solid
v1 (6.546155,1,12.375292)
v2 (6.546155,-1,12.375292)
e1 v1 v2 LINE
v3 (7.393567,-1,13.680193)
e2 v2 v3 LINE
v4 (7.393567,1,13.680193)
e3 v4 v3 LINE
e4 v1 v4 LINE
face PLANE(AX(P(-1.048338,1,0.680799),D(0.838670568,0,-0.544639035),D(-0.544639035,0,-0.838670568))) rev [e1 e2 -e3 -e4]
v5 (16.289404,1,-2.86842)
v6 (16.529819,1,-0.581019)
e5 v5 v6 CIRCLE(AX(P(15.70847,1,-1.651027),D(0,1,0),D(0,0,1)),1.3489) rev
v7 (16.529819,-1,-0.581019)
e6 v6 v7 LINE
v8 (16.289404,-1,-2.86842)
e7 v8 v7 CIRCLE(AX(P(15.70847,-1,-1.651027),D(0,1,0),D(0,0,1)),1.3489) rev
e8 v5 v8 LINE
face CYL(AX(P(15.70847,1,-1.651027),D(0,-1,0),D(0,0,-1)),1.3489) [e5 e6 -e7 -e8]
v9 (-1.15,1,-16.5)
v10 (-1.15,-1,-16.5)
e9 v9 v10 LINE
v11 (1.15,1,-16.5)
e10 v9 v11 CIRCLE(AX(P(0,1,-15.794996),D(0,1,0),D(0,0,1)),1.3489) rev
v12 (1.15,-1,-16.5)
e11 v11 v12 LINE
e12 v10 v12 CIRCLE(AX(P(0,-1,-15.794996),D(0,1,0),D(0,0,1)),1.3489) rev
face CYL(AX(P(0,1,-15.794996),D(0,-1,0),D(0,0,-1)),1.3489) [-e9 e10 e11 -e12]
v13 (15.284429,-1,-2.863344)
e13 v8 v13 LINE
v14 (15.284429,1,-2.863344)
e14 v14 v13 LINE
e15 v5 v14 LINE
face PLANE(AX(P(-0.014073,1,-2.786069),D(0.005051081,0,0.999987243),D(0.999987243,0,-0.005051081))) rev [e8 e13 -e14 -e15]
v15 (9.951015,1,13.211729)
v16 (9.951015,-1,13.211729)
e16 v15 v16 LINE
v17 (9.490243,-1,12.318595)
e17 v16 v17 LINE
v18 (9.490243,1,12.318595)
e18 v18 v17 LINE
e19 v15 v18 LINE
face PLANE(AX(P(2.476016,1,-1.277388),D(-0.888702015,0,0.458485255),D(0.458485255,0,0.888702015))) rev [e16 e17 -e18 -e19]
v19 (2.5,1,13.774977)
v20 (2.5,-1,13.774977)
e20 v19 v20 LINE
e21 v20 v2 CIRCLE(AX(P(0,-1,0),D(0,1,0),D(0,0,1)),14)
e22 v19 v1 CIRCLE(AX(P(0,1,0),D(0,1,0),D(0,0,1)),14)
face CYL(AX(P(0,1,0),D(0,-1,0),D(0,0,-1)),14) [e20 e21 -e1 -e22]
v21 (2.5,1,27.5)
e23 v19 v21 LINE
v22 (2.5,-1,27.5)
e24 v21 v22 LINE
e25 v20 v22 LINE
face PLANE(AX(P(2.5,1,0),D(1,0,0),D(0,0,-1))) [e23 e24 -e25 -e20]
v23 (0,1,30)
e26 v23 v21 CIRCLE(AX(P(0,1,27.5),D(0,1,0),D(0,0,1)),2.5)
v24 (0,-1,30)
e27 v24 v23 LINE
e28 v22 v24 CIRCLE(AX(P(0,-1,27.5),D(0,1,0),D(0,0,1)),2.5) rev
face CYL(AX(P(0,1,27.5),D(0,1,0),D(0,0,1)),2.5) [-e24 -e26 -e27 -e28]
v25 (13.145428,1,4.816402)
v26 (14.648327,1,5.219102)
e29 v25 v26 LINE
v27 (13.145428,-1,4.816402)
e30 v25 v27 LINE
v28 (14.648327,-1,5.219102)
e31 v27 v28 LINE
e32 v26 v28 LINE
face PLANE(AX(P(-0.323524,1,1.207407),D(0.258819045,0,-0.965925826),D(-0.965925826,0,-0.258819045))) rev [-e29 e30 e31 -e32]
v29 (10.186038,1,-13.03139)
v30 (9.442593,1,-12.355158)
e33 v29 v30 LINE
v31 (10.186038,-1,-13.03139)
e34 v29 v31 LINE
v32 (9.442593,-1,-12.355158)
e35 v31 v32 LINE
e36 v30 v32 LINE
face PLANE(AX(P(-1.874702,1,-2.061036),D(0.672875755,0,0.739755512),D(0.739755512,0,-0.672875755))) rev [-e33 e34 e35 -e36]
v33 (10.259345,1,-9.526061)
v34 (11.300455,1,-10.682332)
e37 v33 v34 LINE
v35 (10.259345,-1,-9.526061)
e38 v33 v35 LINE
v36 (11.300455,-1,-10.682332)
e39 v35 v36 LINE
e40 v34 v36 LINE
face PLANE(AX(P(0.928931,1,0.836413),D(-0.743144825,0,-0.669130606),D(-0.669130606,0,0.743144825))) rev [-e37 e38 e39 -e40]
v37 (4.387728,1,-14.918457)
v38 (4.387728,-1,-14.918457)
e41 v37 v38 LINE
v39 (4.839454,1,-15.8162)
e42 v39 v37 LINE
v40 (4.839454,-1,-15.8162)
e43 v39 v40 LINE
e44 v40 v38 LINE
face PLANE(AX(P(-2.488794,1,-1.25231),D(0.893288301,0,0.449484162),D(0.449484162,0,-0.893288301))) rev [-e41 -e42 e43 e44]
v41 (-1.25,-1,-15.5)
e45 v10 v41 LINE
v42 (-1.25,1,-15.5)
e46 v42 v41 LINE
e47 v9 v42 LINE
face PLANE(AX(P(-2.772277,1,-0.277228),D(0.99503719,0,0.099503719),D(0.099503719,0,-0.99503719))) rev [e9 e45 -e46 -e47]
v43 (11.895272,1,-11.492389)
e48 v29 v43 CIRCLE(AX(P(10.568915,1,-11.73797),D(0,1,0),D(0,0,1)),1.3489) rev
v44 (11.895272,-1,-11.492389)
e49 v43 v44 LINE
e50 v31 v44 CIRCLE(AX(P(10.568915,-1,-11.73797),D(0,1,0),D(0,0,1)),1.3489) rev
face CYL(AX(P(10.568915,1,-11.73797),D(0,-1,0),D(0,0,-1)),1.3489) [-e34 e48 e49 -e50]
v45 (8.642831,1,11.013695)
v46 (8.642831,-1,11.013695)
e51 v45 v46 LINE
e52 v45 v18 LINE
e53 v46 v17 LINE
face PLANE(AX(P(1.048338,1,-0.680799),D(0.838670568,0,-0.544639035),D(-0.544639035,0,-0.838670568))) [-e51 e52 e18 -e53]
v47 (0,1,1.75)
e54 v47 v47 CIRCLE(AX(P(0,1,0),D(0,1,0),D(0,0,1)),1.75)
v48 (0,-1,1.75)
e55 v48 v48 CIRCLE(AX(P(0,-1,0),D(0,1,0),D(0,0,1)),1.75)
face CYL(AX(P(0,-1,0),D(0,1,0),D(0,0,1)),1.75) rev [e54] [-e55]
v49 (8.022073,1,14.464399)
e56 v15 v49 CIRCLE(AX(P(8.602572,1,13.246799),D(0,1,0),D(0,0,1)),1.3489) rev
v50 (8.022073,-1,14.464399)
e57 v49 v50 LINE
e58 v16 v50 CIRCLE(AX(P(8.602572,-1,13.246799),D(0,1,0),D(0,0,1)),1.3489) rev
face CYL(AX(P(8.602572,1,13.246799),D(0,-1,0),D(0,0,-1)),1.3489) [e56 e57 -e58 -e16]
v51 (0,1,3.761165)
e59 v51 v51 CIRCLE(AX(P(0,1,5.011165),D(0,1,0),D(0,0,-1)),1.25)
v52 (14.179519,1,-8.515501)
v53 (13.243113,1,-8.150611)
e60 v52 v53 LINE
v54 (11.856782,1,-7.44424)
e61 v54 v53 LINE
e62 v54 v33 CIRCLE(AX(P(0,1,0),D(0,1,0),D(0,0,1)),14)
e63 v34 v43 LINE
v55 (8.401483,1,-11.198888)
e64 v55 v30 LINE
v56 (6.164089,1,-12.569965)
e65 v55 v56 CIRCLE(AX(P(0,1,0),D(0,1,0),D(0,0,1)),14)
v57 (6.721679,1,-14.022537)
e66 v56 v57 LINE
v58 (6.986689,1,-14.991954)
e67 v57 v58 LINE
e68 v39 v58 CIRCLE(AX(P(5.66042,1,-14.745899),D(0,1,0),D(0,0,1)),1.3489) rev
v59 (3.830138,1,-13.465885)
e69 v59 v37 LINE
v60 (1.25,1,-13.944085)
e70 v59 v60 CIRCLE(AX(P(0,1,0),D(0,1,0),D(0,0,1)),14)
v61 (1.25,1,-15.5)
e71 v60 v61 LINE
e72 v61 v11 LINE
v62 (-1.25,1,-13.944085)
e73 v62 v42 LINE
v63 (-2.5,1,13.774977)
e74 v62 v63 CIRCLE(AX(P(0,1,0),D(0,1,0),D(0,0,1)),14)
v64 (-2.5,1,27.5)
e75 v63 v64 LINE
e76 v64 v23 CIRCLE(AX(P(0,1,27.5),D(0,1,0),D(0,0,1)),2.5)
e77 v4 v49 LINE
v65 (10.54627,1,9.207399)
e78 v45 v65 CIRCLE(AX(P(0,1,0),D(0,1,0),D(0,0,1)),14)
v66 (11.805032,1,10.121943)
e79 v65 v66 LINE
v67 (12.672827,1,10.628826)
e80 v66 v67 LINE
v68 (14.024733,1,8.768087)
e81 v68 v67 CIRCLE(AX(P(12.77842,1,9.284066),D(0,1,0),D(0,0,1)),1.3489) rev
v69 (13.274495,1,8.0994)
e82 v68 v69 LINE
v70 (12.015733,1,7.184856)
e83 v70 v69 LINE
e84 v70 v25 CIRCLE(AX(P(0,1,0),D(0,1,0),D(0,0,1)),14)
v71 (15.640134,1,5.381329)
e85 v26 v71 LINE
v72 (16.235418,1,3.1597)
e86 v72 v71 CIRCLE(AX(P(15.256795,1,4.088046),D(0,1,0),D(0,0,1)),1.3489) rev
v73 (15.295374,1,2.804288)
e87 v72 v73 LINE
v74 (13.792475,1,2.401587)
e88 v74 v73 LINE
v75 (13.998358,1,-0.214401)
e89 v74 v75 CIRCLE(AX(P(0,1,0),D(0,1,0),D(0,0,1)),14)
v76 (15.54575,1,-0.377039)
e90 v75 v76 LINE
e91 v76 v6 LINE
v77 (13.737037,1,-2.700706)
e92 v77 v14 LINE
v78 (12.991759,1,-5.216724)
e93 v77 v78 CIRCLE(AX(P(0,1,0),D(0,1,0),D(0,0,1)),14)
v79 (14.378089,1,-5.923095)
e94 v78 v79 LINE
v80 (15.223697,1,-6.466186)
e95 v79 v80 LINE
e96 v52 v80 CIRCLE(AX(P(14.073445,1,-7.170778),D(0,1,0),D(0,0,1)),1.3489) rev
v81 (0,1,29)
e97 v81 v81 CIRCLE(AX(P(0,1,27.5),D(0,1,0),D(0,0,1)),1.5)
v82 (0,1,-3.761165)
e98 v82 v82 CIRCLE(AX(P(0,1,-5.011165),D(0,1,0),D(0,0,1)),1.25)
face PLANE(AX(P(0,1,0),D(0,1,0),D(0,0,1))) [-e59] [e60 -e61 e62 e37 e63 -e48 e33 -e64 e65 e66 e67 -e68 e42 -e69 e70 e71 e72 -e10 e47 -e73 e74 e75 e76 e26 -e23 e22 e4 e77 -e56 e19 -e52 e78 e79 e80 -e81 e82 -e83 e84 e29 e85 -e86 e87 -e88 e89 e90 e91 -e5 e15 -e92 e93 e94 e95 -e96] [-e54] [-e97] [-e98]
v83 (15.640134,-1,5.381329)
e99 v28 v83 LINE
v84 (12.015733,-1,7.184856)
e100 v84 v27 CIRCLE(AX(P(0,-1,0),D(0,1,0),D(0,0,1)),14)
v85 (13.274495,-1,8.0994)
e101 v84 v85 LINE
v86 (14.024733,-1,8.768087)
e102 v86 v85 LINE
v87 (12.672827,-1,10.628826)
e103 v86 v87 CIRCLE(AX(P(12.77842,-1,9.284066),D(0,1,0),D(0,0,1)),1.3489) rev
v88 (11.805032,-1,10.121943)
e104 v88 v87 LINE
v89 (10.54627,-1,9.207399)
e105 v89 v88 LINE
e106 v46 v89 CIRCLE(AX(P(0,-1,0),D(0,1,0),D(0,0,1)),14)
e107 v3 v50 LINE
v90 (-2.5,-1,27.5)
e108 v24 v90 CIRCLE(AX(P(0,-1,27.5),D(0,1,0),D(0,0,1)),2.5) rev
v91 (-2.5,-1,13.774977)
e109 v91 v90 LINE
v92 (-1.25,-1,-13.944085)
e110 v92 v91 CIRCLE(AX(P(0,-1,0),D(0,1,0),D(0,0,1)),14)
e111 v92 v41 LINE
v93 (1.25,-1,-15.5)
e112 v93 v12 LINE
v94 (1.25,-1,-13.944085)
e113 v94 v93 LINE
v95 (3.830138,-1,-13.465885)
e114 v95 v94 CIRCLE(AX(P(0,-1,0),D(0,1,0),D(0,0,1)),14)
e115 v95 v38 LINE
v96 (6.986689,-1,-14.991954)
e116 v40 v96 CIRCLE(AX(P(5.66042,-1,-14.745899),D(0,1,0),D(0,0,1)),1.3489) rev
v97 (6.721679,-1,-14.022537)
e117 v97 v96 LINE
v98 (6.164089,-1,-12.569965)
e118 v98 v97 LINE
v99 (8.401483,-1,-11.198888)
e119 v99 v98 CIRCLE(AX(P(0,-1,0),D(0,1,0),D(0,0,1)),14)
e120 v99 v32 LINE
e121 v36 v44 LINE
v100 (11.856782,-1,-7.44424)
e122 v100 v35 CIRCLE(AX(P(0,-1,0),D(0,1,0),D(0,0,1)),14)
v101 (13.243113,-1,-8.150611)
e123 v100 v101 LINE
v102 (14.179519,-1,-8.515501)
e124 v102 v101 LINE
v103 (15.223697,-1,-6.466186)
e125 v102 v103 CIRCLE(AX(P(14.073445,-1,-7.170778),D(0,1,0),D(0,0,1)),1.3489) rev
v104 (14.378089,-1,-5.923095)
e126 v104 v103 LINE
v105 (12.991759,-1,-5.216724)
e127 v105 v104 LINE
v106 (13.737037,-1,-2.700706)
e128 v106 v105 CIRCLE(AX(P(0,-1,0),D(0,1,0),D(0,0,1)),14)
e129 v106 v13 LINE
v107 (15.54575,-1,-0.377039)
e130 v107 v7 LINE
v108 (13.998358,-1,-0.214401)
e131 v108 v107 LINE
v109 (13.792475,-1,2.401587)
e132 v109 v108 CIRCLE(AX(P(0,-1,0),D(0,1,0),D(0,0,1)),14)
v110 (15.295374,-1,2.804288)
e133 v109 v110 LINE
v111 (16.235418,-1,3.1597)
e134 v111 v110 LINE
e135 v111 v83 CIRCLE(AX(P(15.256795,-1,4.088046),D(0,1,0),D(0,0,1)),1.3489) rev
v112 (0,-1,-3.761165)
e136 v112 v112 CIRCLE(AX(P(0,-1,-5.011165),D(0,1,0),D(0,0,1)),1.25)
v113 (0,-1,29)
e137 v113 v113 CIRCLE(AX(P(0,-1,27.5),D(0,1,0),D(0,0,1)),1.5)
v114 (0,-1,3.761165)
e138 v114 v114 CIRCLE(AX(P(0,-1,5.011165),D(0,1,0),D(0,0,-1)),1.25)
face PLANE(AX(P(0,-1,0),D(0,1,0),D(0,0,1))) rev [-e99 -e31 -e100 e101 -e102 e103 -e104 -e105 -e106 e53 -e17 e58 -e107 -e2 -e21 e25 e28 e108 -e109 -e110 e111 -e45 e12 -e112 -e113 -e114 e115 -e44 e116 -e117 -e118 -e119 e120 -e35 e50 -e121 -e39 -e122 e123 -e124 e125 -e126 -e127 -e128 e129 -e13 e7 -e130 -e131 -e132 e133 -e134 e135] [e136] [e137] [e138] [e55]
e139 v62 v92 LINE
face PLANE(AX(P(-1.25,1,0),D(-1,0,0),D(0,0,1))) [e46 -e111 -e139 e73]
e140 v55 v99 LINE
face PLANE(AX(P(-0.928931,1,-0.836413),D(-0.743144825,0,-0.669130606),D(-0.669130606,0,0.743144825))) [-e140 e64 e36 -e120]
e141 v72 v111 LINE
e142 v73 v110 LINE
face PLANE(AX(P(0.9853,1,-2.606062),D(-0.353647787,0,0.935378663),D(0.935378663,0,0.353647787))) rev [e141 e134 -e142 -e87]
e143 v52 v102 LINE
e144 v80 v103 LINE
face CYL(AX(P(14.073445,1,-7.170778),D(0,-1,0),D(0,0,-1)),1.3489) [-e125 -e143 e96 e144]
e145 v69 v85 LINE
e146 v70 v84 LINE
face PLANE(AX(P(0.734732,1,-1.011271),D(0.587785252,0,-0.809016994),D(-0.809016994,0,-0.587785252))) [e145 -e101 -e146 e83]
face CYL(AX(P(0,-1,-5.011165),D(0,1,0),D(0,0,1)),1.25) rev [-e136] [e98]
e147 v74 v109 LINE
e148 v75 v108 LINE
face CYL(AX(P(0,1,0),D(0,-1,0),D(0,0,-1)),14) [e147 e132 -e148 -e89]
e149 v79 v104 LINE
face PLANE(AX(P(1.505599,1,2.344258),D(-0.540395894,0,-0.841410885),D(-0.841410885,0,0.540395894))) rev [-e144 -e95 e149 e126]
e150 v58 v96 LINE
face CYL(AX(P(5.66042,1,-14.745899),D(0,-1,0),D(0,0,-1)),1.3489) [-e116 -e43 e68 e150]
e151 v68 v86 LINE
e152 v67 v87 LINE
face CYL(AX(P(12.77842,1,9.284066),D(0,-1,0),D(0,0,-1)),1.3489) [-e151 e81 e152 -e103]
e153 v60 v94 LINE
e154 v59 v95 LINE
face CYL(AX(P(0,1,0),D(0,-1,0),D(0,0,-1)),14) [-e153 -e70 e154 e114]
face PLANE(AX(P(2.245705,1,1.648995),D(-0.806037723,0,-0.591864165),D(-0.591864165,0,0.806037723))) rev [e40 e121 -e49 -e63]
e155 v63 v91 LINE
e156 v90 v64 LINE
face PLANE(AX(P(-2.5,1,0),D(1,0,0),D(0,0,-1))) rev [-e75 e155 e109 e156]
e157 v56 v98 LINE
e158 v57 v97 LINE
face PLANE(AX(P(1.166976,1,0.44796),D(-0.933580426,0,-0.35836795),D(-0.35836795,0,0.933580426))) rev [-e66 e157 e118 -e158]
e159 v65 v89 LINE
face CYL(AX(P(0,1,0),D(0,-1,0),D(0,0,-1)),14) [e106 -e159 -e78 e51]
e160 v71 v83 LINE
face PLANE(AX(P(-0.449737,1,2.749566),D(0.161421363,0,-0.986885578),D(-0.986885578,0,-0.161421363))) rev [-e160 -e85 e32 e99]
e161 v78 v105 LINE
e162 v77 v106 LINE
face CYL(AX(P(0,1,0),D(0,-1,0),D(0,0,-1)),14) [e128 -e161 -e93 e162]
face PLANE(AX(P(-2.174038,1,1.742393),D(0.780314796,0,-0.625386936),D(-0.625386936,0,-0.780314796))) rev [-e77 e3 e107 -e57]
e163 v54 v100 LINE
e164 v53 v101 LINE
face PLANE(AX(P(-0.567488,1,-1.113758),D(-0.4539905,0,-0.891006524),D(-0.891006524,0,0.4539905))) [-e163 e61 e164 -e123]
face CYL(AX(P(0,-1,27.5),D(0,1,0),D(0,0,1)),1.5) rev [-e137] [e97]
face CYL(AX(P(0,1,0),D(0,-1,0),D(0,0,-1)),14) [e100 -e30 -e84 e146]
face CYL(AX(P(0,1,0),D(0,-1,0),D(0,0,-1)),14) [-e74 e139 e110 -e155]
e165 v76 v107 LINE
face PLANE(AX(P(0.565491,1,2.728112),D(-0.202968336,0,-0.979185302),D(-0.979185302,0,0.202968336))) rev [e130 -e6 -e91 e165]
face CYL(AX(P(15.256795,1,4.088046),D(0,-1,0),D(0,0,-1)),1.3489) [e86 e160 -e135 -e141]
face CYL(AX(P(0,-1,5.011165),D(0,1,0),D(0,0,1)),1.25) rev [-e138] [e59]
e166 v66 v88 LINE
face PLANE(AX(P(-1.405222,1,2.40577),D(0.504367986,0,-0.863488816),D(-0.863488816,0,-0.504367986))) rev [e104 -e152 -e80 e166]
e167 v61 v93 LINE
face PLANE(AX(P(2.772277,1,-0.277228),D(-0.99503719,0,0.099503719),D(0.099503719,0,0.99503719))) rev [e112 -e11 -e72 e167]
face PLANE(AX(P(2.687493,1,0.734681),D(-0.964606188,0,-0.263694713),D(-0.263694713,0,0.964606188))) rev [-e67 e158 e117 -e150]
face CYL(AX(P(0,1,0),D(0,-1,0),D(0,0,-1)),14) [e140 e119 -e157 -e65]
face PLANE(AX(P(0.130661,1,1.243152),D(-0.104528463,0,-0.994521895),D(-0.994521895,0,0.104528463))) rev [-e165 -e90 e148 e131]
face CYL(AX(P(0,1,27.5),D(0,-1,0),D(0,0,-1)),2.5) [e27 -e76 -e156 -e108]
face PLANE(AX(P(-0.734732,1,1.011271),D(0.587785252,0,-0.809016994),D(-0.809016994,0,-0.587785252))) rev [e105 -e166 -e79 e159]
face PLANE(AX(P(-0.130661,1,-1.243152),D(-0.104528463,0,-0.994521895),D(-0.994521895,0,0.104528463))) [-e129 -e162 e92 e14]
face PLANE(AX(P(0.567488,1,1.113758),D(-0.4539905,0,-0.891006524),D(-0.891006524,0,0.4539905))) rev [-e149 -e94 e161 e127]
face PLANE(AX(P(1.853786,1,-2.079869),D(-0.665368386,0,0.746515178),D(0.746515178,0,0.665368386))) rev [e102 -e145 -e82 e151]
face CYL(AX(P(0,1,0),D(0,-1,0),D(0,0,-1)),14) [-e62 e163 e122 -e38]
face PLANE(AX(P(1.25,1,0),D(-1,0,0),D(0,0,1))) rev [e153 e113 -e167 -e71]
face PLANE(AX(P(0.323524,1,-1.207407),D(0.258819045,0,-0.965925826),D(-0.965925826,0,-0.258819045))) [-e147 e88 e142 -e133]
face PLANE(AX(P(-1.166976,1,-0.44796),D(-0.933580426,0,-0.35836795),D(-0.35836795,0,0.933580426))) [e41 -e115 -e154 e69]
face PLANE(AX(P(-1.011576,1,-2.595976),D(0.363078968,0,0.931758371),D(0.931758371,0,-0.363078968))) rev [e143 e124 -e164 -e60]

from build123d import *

# Parameters (mm, degrees)
BOSS_EXTRUDE1_DEPTH = 1
SKETCH5_R           = 1.75
SKETCH5_R_2         = 1.25
CUT_EXTRUDE3_DEPTH  = 35.568104475
FILLET1_R           = 2.5
SKETCH6_R           = 1.5
CUT_EXTRUDE4_DEPTH  = 35.568104475


with BuildPart() as part:
    # Sketch1 → Boss-Extrude1 (new, symmetric)
    with BuildSketch(Plane(origin=(0, 0, 0), x_dir=(1, 0, 0), z_dir=(0, 1, 0))):
        with BuildLine():
            Line((1.25, 15.5), (1.15, 16.5))
            ThreePointArc((1.15, 16.5), (0, 17.143895929), (-1.15, 16.5))
            Line((-1.15, 16.5), (-1.25, 15.5))
            Line((-1.25, 15.5), (-1.25, 13.944084767))
            ThreePointArc((-1.25, 13.944084767), (-13.985786559, 0.630693533), (-2.5, -13.774977314))
            Line((-2.5, -13.774977314), (-2.5, -30))
            Line((-2.5, -30), (2.5, -30))
            Line((2.5, -30), (2.5, -13.774977314))
            ThreePointArc((2.5, -13.774977314), (4.576899397, -13.230721519), (6.546154662, -12.375292285))
            Line((6.546154662, -12.375292285), (7.393566833, -13.680192597))
            Line((7.393566833, -13.680192597), (8.022072925, -14.464399261))
            ThreePointArc((8.022072925, -14.464399261), (9.337234935, -14.378080935), (9.951015231, -13.211729481))
            Line((9.951015231, -13.211729481), (9.490243253, -12.318595009))
            Line((9.490243253, -12.318595009), (8.642831082, -11.013694698))
            ThreePointArc((8.642831082, -11.013694698), (9.63696406, -10.155241194), (10.546269982, -9.207398626))
            Line((10.546269982, -9.207398626), (11.805031847, -10.121942654))
            Line((11.805031847, -10.121942654), (12.672827367, -10.628826206))
            ThreePointArc((12.672827367, -10.628826206), (13.869703156, -10.076929194), (14.024733447, -8.768087119))
            Line((14.024733447, -8.768087119), (13.274494978, -8.099400168))
            Line((13.274494978, -8.099400168), (12.015733113, -7.18485614))
            ThreePointArc((12.015733113, -7.18485614), (12.636193981, -6.027155355), (13.145427794, -4.816401987))
            Line((13.145427794, -4.816401987), (14.648326501, -5.219102482))
            Line((14.648326501, -5.219102482), (15.640134232, -5.381328944))
            ThreePointArc((15.640134232, -5.381328944), (16.559731841, -4.437166774), (16.235418036, -3.159699544))
            Line((16.235418036, -3.159699544), (15.295374114, -2.804287916))
            Line((15.295374114, -2.804287916), (13.792475407, -2.401587421))
            ThreePointArc((13.792475407, -2.401587421), (13.956842672, -1.09842734), (13.998358191, 0.214401383))
            Line((13.998358191, 0.214401383), (15.545749957, 0.377038811))
            Line((15.545749957, 0.377038811), (16.529819006, 0.581019464))
            ThreePointArc((16.529819006, 0.581019464), (17.049979873, 1.792025096), (16.289403541, 2.868419824))
            Line((16.289403541, 2.868419824), (15.284428799, 2.86334355))
            Line((15.284428799, 2.86334355), (13.737037033, 2.700706122))
            ThreePointArc((13.737037033, 2.700706122), (13.423476288, 3.976214826), (12.991758626, 5.216723857))
            Line((12.991758626, 5.216723857), (14.37808925, 5.923094591))
            Line((14.37808925, 5.923094591), (15.223696724, 6.466185743))
            ThreePointArc((15.223696724, 6.466185743), (15.275323122, 7.78316588), (14.179518574, 8.515500749))
            Line((14.179518574, 8.515500749), (13.243113, 8.150610901))
            Line((13.243113, 8.150610901), (11.856782377, 7.444240167))
            ThreePointArc((11.856782377, 7.444240167), (11.106946764, 8.522660006), (10.259344927, 9.526061183))
            Line((10.259344927, 9.526061183), (11.30045543, 10.682331537))
            Line((11.30045543, 10.682331537), (11.895271554, 11.492389423))
            ThreePointArc((11.895271554, 11.492389423), (11.471505478, 12.740397548), (10.186038456, 13.031389818))
            Line((10.186038456, 13.031389818), (9.442593367, 12.355158053))
            Line((9.442593367, 12.355158053), (8.401482864, 11.198887699))
            ThreePointArc((8.401482864, 11.198887699), (7.314979906, 11.936962301), (6.164088599, 12.569964667))
            Line((6.164088599, 12.569964667), (6.721678751, 14.022536674))
            Line((6.721678751, 14.022536674), (6.986688658, 14.991953895))
            ThreePointArc((6.986688658, 14.991953895), (6.143822831, 16.005205673), (4.839453677, 15.816200179))
            Line((4.839453677, 15.816200179), (4.387727685, 14.918456548))
            Line((4.387727685, 14.918456548), (3.830137533, 13.465884541))
            ThreePointArc((3.830137533, 13.465884541), (2.551297357, 13.765568706), (1.25, 13.944084767))
            Line((1.25, 13.944084767), (1.25, 15.5))
        make_face()
    extrude(amount=BOSS_EXTRUDE1_DEPTH, both=True)

    # Sketch5 → Cut-Extrude3 (cut, through all)
    with BuildSketch(Plane(origin=(0, 1, 0), x_dir=(1, 0, 0), z_dir=(0, 1, 0))):
        with Locations(Location((0, 0, 0), (0, 0, 270))):
            Circle(SKETCH5_R)
        with Locations(Location((0, 5.011164895, 0), (0, 0, 270))):
            Circle(SKETCH5_R_2)
        with Locations(Location((0, -5.011164895, 0), (0, 0, 90))):
            Circle(SKETCH5_R_2)
    extrude(amount=-CUT_EXTRUDE3_DEPTH, mode=Mode.SUBTRACT)

    # Fillet1
    fillet1_edges = [part.edges().sort_by_distance(p)[0] for p in [
        (-2.5, 0, 30),
        (2.5, 0, 30),
    ]]
    fillet(fillet1_edges, radius=FILLET1_R - 0.0001)  # a hair under: the kernel refuses the full size

    # Sketch6 → Cut-Extrude4 (cut, through all)
    with BuildSketch(Plane(origin=(0, 1, 0), x_dir=(1, 0, 0), z_dir=(0, 1, 0))):
        with Locations(Location((0, -27.5, 0), (0, 0, 270))):
            Circle(SKETCH6_R)
    extrude(amount=-CUT_EXTRUDE4_DEPTH, mode=Mode.SUBTRACT)


solid = part.part
